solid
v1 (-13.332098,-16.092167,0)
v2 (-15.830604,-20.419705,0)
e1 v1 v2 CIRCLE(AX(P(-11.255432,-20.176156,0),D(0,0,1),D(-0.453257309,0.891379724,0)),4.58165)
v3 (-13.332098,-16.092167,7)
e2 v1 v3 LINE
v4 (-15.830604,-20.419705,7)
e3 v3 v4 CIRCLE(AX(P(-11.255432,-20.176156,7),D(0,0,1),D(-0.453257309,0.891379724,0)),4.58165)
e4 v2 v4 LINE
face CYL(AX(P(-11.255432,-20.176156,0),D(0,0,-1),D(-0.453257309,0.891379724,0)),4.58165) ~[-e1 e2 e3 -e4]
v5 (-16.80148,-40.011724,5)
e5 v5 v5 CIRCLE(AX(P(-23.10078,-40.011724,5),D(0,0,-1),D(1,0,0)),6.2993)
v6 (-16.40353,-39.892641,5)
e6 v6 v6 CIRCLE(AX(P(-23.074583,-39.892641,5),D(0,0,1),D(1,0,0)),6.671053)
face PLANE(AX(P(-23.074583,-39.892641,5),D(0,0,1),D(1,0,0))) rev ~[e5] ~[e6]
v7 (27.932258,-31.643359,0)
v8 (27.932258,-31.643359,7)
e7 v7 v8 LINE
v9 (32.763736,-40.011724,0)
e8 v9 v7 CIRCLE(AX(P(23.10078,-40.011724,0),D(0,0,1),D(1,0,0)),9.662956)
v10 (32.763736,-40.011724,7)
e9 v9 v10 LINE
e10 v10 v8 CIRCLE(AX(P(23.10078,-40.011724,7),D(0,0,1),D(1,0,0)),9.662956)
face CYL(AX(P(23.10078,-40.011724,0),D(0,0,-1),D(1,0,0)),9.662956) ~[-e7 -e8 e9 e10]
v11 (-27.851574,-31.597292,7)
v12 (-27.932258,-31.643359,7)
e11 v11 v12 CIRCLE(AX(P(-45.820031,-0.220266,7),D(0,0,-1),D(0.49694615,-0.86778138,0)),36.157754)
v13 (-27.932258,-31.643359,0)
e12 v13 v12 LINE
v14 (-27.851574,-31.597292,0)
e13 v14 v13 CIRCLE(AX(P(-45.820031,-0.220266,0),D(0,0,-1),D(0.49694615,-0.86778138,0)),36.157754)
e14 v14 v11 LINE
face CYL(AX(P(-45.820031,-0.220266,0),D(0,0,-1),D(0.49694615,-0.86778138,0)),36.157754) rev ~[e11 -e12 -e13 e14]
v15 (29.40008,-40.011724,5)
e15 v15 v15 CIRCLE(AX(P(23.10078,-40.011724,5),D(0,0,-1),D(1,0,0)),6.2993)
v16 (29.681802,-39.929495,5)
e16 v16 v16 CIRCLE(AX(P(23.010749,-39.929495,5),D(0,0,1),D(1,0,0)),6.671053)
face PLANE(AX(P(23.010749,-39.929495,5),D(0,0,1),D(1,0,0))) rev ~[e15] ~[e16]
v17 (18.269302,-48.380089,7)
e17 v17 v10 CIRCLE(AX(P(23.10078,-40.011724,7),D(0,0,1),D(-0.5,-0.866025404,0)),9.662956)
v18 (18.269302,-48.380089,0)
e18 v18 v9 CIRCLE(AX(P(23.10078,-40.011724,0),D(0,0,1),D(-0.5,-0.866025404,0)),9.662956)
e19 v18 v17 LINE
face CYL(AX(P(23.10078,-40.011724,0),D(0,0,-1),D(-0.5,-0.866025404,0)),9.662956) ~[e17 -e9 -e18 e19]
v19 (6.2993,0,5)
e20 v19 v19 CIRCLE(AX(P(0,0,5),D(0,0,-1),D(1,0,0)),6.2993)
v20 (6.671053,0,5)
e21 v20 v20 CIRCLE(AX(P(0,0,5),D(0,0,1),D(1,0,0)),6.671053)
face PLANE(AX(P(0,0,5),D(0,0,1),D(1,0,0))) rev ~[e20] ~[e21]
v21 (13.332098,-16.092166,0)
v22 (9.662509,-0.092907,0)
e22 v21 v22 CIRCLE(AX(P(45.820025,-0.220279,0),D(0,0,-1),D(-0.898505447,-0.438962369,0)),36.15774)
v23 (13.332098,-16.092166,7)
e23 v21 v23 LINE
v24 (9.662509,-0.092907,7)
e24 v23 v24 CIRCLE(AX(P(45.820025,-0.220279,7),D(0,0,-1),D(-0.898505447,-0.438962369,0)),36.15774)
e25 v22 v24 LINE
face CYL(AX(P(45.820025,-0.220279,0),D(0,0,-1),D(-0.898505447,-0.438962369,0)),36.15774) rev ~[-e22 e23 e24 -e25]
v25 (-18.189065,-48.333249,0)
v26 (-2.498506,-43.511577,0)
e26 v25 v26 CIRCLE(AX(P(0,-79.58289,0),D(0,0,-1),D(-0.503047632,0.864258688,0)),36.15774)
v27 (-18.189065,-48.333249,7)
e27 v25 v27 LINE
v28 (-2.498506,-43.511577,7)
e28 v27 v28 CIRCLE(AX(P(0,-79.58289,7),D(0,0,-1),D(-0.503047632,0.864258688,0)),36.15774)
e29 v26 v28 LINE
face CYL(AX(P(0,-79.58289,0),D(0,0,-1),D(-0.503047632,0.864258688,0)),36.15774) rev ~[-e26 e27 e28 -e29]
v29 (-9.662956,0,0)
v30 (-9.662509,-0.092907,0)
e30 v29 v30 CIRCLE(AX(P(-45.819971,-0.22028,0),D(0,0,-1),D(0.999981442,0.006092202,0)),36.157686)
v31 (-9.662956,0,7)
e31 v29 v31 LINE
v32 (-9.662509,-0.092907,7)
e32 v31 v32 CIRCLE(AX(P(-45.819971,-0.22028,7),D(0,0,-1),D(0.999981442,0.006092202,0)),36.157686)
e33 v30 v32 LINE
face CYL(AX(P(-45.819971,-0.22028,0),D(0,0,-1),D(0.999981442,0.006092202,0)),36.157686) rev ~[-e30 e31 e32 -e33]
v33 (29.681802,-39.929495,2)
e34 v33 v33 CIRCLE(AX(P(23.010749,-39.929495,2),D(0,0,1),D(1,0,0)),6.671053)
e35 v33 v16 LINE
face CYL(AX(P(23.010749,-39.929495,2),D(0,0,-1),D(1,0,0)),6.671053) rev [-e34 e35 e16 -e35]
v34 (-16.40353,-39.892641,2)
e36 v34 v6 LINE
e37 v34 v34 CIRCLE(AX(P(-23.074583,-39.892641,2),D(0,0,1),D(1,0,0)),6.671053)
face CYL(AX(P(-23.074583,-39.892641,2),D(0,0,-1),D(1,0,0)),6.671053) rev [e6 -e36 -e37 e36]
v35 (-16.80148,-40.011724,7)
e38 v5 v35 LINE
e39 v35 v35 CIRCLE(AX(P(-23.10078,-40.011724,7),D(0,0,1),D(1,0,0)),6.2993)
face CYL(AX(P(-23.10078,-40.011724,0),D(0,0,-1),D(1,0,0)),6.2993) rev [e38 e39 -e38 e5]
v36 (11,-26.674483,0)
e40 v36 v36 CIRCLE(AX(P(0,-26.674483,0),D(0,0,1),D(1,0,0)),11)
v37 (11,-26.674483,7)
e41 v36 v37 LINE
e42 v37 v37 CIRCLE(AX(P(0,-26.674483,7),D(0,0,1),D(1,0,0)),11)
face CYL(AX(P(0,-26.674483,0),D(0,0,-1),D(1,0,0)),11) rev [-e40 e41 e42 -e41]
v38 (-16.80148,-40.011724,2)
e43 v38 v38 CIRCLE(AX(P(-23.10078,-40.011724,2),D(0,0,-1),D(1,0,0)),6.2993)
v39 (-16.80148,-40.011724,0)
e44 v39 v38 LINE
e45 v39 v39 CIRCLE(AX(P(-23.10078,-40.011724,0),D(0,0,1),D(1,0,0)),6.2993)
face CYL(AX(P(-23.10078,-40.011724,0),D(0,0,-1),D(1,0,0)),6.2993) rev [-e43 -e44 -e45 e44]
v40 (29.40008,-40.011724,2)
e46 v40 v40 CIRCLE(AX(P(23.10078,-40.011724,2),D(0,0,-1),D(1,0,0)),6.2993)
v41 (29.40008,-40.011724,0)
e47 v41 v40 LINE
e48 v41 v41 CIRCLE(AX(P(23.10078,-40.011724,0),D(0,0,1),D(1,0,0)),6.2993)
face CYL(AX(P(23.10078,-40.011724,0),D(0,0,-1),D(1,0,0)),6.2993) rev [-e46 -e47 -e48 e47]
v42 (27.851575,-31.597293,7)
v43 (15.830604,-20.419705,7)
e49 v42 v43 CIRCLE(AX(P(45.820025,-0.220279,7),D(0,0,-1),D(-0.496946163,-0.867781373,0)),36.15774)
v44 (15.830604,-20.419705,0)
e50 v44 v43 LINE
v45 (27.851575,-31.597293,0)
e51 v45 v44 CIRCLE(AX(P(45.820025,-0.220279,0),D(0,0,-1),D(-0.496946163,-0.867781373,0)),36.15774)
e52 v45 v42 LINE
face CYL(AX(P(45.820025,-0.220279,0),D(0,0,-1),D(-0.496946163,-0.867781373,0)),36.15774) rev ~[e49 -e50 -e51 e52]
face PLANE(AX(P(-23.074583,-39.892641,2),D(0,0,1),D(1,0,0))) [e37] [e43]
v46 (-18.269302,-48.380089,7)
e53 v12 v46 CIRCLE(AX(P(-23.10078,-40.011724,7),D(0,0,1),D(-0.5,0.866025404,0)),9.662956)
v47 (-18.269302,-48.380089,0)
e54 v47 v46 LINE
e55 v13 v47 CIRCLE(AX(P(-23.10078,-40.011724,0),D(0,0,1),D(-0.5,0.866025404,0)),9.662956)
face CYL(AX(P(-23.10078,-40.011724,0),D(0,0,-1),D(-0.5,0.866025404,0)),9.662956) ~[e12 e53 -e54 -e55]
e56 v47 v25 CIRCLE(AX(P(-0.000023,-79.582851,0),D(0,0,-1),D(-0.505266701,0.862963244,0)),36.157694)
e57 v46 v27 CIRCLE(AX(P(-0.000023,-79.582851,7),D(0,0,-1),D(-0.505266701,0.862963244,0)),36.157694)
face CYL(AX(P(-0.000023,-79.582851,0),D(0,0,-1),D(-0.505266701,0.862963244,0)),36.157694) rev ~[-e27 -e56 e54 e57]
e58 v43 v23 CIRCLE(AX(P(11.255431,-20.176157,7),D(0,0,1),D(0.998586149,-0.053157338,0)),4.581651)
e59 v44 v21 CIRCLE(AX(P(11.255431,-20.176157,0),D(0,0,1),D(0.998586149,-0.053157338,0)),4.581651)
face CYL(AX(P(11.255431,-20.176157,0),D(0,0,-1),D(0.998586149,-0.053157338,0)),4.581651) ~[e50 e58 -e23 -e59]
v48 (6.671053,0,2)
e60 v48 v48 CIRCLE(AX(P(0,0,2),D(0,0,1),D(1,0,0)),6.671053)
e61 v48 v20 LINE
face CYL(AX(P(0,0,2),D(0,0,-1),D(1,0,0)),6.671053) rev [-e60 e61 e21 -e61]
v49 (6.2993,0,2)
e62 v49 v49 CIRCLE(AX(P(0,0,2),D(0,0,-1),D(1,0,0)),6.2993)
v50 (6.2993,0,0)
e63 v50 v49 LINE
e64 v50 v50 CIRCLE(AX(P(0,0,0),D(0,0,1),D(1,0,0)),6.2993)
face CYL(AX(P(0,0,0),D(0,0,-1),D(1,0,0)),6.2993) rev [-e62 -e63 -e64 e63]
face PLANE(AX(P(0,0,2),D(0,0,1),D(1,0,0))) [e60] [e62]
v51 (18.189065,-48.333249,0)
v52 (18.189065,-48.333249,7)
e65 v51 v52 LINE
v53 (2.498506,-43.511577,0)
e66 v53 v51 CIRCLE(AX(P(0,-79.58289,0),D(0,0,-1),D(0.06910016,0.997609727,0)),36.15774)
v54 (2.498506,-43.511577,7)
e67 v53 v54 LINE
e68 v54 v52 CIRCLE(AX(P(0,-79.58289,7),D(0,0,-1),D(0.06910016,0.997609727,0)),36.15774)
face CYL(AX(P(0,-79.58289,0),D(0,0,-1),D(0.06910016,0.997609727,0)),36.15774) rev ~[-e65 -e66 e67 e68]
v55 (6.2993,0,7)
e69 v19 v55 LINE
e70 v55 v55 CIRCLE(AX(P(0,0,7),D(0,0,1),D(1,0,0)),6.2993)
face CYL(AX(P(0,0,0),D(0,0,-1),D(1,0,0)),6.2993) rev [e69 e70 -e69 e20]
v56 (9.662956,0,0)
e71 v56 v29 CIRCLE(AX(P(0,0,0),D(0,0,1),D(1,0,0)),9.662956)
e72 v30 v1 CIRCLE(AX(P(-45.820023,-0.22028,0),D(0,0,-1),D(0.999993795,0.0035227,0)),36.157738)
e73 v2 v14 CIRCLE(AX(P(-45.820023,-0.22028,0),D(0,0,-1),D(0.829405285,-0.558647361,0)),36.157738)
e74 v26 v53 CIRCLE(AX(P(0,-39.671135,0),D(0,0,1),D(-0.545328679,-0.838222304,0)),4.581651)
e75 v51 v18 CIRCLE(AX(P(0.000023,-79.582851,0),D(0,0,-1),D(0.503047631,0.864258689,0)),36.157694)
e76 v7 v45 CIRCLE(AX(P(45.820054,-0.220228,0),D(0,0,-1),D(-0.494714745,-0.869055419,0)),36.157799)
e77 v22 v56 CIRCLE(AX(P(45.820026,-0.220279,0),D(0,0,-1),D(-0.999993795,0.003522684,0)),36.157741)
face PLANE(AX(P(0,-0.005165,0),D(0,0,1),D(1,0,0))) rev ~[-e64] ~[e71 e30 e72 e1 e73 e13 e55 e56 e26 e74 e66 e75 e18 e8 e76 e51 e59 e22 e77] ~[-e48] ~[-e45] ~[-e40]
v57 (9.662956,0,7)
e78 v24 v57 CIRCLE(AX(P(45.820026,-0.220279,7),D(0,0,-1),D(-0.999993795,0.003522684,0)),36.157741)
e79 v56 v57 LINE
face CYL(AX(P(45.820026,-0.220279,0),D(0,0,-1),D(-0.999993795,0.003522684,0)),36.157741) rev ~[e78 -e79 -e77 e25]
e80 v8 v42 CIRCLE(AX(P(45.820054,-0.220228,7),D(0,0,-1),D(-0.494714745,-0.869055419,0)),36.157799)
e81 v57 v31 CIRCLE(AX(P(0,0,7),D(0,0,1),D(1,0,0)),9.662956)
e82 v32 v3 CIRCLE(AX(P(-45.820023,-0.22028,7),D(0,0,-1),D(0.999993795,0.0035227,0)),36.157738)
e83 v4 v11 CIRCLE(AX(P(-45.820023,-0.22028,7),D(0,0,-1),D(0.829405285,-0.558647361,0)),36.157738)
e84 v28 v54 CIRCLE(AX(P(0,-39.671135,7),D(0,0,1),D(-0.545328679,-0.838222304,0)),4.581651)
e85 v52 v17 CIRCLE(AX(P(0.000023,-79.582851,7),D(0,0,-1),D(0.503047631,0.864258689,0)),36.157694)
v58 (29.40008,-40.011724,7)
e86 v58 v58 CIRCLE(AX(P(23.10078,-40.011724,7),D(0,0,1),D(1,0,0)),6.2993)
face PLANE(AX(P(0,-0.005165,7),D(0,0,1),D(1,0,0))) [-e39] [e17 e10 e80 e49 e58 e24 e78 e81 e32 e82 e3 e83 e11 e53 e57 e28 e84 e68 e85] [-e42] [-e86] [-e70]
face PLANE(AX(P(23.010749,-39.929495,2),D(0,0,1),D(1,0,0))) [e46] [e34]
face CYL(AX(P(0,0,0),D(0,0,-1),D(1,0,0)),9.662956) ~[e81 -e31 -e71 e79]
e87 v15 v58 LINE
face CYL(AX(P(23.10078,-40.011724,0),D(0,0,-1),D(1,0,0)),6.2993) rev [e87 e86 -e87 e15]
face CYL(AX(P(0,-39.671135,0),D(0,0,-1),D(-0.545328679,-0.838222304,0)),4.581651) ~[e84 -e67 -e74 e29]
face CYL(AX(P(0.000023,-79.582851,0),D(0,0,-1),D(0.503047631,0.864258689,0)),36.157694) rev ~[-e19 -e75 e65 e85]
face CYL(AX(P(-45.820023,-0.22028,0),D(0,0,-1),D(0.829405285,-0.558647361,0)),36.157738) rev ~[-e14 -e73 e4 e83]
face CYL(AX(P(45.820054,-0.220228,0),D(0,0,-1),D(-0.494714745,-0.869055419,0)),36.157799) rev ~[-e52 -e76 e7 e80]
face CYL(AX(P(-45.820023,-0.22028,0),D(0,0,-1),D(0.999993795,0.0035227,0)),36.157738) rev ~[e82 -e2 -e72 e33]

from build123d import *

# Parameters (mm, degrees)
F0_R     = 6.2993
F0_R_2   = 11
F1_DEPTH = 7
F4_R     = 6.6710532067
F5_DEPTH = 3


# Not quite as in the source:
# - ends of sketch curves that miss each other by under 0.0002 mm in the source are joined
# - a feature names something its author has since deleted; it is built from what else it names


with BuildPart() as f1:
    # F0 (on Top) → F1 (new body)
    with BuildSketch(Plane.XY):
        with BuildLine():
            ThreePointArc((9.6625090534, -0.0929069647), (9.6627025372, -0.0464533389), (9.6629557026, 0))
            ThreePointArc((9.6629557026, 0), (0, 9.6629557026), (-9.6629557026, 0))
            ThreePointArc((-9.6629557026, 0), (-9.662702535, -0.0464535369), (-9.6625090496, -0.0929073607))
            ThreePointArc((-9.6625090496, -0.0929073607), (1.98e-07, -9.6629557026), (9.6625090534, -0.0929069647))
        make_face()
        Circle(F0_R, mode=Mode.SUBTRACT)
        with BuildLine():
            ThreePointArc((-13.4378241011, -40.0117243144), (-18.2291272521, -31.6666830127), (-27.8515741938, -31.5972923328))
            ThreePointArc((-27.8515741938, -31.5972923328), (-27.8919011281, -31.6203516814), (-27.9322576549, -31.6433592003))
            ThreePointArc((-27.9322576549, -31.6433592003), (-31.4691449177, -44.8432021657), (-18.2693019524, -48.3800894285))
            ThreePointArc((-18.2693019524, -48.3800894285), (-18.2291987635, -48.3566435113), (-18.1890654853, -48.3332491365))
            ThreePointArc((-18.1890654853, -48.3332491365), (-14.7092843829, -44.8029159735), (-13.4378241011, -40.0117243144))
        make_face()
        with Locations((-23.1007798037, -40.0117243144)):
            Circle(F0_R, mode=Mode.SUBTRACT)
        with BuildLine():
            ThreePointArc((27.9322576549, -31.6433592003), (27.8919013007, -31.6203517785), (27.8515745387, -31.5972925275))
            ThreePointArc((27.8515745387, -31.5972925275), (14.7324146896, -35.1802464631), (18.1890654853, -48.3332491365))
            ThreePointArc((18.1890654853, -48.3332491365), (18.2291987635, -48.3566435113), (18.2693019524, -48.3800894285))
            ThreePointArc((18.2693019524, -48.3800894285), (27.9322576549, -48.3800894285), (32.7637355062, -40.0117243144))
            ThreePointArc((32.7637355062, -40.0117243144), (31.4691449177, -35.1802464631), (27.9322576549, -31.6433592003))
        make_face()
        with Locations((23.1007798037, -40.0117243144)):
            Circle(F0_R, mode=Mode.SUBTRACT)
        with BuildLine():
            ThreePointArc((13.3320983645, -16.0921664972), (10.5773906807, -8.3035279339), (9.6625090534, -0.0929069647))
            ThreePointArc((9.6625090534, -0.0929069647), (1.98e-07, -9.6629557026), (-9.6625090496, -0.0929073607))
            ThreePointArc((-9.6625090496, -0.0929073607), (-10.5773905595, -8.3035281796), (-13.3320981392, -16.0921666073))
            ThreePointArc((-13.3320981392, -16.0921666073), (-14.506503102, -18.2991494053), (-15.8306037894, -20.4197053365))
            ThreePointArc((-15.8306037894, -20.4197053365), (-21.1984087389, -26.6996712943), (-27.8515741938, -31.5972923328))
            ThreePointArc((-27.8515741938, -31.5972923328), (-18.2291272521, -31.6666830127), (-13.4378241011, -40.0117243144))
            ThreePointArc((-13.4378241011, -40.0117243144), (-14.7092843829, -44.8029159735), (-18.1890654853, -48.3332491365))
            ThreePointArc((-18.1890654853, -48.3332491365), (-10.6210183315, -45.0202493827), (-2.4985056329, -43.5115769352))
            ThreePointArc((-2.4985056329, -43.5115769352), (0, -43.4251500733), (2.4985056329, -43.5115769352))
            ThreePointArc((2.4985056329, -43.5115769352), (10.6210183315, -45.0202493827), (18.1890654853, -48.3332491365))
            ThreePointArc((18.1890654853, -48.3332491365), (14.7324146896, -35.1802464631), (27.8515745387, -31.5972925275))
            ThreePointArc((27.8515745387, -31.5972925275), (21.1984090122, -26.6996713122), (15.8306039974, -20.4197051964))
            ThreePointArc((15.8306039974, -20.4197051964), (14.506503323, -18.2991492777), (13.3320983645, -16.0921664972))
        make_face()
        with Locations((0, -26.6744828763)):
            Circle(F0_R_2, mode=Mode.SUBTRACT)
        with BuildLine():
            ThreePointArc((15.8306039974, -20.4197051964), (15.223256939, -17.8853313846), (13.3320983645, -16.0921664972))
            ThreePointArc((13.3320983645, -16.0921664972), (14.506503323, -18.2991492777), (15.8306039974, -20.4197051964))
        make_face()
        with BuildLine():
            ThreePointArc((-15.8306037894, -20.4197053365), (-14.506503102, -18.2991494053), (-13.3320981392, -16.0921666073))
            ThreePointArc((-13.3320981392, -16.0921666073), (-15.223256939, -17.8853313846), (-15.8306037894, -20.4197053365))
        make_face()
        with BuildLine():
            ThreePointArc((-2.4985056329, -43.5115769352), (0, -44.2527858596), (2.4985056329, -43.5115769352))
            ThreePointArc((2.4985056329, -43.5115769352), (0, -43.4251500733), (-2.4985056329, -43.5115769352))
        make_face()
    extrude(amount=F1_DEPTH)

    # F4 (on line) → F5 (cut)
    with BuildSketch(Plane.XY.offset(2)):
        Circle(F4_R)
        with Locations((-23.0745827089, -39.8926408961)):
            Circle(F4_R)
        with Locations((23.0107490857, -39.9294952557)):
            Circle(F4_R)
    extrude(amount=F5_DEPTH, mode=Mode.SUBTRACT)


solid = f1.part
